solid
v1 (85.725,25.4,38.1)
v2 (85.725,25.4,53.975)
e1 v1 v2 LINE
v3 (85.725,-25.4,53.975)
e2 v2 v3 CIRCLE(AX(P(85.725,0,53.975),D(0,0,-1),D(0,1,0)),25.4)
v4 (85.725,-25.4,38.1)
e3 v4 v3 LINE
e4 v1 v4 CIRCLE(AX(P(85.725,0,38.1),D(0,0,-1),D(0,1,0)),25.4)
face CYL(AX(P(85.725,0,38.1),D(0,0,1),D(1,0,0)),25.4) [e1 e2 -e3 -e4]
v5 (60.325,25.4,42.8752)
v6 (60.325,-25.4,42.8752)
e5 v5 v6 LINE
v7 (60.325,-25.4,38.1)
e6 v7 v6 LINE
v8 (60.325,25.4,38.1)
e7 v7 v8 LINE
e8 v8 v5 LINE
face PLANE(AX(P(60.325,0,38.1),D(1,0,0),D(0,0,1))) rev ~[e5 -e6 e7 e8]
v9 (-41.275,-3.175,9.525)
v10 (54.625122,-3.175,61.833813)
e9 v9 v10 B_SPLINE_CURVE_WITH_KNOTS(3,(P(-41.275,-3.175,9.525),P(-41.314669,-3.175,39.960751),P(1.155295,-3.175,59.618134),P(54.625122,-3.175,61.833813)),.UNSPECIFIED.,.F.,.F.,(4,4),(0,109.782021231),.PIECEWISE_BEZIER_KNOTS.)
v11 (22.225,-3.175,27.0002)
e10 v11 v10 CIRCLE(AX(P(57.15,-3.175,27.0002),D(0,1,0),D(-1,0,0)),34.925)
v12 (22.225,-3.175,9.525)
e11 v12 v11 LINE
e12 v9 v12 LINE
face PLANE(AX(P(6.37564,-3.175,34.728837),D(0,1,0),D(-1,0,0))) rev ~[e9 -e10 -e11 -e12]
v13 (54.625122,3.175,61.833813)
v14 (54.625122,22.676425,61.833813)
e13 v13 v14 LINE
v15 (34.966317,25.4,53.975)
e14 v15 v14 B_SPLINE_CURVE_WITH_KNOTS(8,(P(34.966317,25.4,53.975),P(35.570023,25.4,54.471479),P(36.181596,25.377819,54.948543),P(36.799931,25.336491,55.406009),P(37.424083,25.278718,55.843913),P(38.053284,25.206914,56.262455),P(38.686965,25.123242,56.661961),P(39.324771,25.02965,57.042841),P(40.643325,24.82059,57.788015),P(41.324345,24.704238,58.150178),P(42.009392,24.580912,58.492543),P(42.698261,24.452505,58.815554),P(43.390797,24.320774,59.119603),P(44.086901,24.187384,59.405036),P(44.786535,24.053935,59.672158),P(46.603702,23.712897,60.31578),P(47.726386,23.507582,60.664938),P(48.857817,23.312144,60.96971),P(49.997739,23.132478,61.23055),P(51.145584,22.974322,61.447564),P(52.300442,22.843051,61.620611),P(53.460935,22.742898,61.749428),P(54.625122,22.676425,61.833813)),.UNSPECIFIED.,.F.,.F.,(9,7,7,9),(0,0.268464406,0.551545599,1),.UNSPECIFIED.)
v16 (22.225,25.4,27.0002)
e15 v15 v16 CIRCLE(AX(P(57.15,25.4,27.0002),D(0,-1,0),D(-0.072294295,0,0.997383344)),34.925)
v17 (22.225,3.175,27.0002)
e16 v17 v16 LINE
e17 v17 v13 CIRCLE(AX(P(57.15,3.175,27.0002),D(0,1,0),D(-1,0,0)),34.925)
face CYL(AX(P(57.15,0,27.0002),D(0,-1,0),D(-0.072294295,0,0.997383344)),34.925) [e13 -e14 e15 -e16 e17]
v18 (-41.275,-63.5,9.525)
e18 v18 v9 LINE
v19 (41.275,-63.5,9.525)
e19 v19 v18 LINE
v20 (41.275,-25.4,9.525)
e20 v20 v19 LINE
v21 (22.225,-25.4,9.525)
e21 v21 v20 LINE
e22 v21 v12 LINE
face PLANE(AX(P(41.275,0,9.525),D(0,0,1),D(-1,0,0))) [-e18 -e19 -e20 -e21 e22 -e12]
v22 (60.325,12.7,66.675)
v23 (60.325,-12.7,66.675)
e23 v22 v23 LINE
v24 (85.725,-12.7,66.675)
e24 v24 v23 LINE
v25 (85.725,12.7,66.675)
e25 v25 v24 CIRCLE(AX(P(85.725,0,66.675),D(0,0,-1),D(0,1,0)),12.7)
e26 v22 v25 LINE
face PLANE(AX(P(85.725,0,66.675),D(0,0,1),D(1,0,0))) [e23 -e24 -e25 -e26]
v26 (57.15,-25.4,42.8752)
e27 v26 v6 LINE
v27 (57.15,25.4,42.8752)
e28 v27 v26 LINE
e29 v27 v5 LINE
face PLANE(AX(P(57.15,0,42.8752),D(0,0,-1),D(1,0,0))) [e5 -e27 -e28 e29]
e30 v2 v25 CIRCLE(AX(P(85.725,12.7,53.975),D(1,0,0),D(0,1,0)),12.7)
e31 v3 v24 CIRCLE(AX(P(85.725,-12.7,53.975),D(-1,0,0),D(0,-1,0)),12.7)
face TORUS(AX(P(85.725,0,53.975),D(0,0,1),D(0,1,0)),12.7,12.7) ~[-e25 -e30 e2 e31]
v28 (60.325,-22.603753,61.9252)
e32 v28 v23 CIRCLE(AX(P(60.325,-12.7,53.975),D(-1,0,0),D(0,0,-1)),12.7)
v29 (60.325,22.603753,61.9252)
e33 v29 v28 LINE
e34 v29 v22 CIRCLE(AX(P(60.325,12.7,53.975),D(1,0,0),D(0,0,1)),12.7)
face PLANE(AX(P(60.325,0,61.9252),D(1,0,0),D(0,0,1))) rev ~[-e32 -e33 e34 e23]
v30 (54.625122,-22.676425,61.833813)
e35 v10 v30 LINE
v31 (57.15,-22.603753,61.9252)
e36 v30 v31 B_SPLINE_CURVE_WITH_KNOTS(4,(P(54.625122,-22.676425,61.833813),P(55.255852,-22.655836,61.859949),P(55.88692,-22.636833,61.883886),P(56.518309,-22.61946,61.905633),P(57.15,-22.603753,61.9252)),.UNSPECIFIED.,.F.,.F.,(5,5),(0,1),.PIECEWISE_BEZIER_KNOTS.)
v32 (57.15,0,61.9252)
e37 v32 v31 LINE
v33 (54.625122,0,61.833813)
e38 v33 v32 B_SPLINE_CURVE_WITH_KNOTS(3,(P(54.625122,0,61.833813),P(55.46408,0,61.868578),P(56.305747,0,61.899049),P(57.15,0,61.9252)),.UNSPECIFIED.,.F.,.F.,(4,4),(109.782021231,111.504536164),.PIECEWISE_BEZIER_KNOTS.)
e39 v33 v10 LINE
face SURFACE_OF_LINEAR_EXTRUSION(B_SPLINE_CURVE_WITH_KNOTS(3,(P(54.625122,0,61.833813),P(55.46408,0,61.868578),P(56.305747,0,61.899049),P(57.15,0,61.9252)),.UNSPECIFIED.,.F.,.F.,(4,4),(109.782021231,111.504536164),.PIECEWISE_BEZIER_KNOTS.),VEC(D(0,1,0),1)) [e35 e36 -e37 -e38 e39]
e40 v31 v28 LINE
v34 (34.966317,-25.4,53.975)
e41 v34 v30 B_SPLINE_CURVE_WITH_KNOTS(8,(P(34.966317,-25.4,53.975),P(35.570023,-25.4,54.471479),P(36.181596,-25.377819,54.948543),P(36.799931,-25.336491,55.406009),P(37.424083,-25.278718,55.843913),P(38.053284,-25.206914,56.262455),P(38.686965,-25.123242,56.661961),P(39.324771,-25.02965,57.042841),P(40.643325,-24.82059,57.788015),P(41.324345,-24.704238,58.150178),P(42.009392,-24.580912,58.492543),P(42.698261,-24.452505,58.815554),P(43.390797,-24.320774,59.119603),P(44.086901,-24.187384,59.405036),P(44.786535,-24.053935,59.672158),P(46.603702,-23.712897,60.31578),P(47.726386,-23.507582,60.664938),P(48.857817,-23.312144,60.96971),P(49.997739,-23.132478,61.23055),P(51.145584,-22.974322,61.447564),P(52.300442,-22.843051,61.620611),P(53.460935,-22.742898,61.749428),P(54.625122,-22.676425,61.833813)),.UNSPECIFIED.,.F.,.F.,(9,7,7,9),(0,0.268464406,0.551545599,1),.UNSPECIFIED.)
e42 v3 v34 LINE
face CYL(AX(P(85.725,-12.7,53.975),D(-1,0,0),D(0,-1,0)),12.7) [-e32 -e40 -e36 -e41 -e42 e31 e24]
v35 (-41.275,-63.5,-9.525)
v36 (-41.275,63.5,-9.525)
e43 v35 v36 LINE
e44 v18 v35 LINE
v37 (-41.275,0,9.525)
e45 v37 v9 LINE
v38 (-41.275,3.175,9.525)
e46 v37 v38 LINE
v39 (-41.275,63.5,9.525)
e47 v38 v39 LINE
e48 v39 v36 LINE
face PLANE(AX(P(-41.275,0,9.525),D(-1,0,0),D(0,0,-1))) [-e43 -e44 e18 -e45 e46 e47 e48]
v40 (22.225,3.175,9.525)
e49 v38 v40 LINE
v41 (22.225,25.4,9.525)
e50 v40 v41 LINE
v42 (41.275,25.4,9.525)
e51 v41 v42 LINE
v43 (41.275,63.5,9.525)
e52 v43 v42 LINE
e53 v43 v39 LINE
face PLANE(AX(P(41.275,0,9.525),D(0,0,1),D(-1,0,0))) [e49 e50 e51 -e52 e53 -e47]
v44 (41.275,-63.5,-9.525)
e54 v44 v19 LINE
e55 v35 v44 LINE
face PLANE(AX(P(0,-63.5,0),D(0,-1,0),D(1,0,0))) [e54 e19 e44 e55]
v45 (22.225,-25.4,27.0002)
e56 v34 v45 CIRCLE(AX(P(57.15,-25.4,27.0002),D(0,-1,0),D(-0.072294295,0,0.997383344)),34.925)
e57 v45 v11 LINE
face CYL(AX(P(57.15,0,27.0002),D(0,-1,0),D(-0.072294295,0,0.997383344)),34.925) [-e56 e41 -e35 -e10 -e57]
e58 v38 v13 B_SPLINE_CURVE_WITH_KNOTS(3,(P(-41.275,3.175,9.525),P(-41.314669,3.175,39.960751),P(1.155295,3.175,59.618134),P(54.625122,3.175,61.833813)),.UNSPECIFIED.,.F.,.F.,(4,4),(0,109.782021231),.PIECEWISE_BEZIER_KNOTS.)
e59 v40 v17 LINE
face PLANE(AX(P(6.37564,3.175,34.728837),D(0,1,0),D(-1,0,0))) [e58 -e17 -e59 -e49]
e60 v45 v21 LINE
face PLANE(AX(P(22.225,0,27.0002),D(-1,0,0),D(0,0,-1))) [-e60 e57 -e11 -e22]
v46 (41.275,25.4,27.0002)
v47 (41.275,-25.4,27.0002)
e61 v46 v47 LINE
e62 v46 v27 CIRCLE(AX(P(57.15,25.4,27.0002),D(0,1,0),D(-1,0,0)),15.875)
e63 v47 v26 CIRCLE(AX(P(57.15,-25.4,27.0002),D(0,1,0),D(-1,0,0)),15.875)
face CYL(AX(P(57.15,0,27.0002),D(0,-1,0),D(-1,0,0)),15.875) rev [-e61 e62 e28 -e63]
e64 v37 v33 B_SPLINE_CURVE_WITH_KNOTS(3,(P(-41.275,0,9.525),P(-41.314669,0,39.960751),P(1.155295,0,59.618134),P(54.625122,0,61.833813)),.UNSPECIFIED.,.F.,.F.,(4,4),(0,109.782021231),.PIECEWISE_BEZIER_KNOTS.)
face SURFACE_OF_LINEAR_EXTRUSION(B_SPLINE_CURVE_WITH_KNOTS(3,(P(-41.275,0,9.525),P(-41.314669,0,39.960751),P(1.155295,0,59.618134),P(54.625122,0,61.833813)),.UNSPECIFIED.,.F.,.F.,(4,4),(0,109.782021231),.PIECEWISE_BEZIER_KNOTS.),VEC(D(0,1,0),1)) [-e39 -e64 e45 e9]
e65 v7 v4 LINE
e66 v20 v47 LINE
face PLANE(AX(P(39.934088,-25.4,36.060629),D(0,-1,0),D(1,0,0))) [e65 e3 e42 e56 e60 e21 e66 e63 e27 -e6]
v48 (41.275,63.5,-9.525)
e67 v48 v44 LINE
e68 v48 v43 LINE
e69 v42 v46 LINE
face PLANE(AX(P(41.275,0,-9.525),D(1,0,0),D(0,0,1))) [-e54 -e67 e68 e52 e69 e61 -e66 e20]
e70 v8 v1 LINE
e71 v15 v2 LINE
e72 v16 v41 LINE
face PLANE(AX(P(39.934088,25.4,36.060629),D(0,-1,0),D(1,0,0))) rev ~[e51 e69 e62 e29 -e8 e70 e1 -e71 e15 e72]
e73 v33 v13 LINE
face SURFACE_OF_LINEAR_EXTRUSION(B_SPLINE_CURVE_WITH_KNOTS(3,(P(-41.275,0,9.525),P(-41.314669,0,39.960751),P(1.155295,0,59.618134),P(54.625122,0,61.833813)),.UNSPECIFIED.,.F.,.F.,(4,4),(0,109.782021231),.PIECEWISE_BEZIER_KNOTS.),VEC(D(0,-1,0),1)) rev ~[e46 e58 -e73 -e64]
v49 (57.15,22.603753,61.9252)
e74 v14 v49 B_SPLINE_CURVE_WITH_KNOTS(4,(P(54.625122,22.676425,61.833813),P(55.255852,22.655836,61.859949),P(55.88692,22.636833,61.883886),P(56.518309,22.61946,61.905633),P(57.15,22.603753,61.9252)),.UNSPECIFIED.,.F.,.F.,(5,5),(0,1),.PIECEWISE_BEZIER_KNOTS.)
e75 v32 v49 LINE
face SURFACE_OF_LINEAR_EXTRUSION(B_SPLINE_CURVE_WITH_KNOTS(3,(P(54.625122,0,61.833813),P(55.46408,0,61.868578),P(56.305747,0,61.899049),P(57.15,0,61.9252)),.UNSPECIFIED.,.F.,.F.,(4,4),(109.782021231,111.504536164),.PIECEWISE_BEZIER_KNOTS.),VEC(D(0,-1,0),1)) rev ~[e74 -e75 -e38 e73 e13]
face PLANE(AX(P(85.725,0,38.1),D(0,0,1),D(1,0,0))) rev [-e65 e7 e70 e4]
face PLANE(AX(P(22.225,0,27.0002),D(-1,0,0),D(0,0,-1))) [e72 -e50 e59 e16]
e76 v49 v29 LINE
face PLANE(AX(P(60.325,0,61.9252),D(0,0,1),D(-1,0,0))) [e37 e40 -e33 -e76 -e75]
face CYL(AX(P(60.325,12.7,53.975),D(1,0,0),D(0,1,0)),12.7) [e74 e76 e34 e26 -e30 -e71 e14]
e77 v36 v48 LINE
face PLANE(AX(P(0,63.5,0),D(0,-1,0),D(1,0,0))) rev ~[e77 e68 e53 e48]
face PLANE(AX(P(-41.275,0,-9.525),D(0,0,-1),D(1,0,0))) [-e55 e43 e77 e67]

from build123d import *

# Parameters (mm, degrees)
F1_DEPTH = 63.5
F0_W     = 25.4
F0_H     = 19.05
F0_H_2   = 4.7498
F0_H_3   = 4.7752
F2_DEPTH = 25.4
F4_DEPTH = 3.175
F5_R     = 12.7


with BuildPart() as f1:
    # F0 (on Front) → F1 (new body, symmetric)
    with BuildSketch(Plane.XZ):
        Polygon((-41.275, -9.525), (41.275, -9.525), (41.275, 9.525), (22.225, 9.525), (-41.275, 9.525), align=None)
    extrude(amount=F1_DEPTH, both=True)

    # F0 (on Front) → F2 (join, symmetric)
    with BuildSketch(Plane.XZ):
        with BuildLine():
            Line((22.225, 9.525), (41.275, 9.525))
            Line((41.275, 9.525), (41.275, 27.0002))
            ThreePointArc((41.275, 27.0002), (45.9246798487, 38.2255201513), (57.15, 42.8752))
            Line((57.15, 42.8752), (60.325, 42.8752))
            Line((60.325, 42.8752), (60.325, 61.9252))
            Line((60.325, 61.9252), (57.15, 61.9252))
            add(Edge.make_bspline(
                [(54.6251217416, 61.8338132892), (55.4640803854, 61.8685780106), (56.3057470428, 61.8990488271), (57.15, 61.9252)],
                knots=[109.7820212307, 109.7820212307, 109.7820212307, 109.7820212307, 111.5045361635, 111.5045361635, 111.5045361635, 111.5045361635], degree=3))
            ThreePointArc((54.6251217416, 61.8338132892), (31.5771921939, 50.7864802033), (22.225, 27.0002))
            Line((22.225, 27.0002), (22.225, 9.525))
        make_face()
        with Locations((73.025, 52.4002)):
            Rectangle(F0_W, F0_H)
        with Locations((73.025, 64.3001)):
            Rectangle(F0_W, F0_H_2)
        with Locations((73.025, 40.4876)):
            Rectangle(F0_W, F0_H_3)
    extrude(amount=F2_DEPTH, both=True)

    # F0 (on Front) → F3 (revolve)
    with BuildSketch(Plane.XZ):
        Polygon((85.725, 61.9252), (85.725, 42.8752), (85.725, 38.1), (111.125, 38.1), (111.125, 66.675), (85.725, 66.675), align=None)
    revolve(axis=Axis((85.725, 0, 52.3875), (0, 0, 1)))

    # F0 (on Front) → F4 (join, symmetric)
    with BuildSketch(Plane.XZ):
        with BuildLine():
            add(Edge.make_bspline(
                [(-41.275, 9.525), (-41.3146686629, 39.9607514864), (1.1552946366, 59.618133583), (54.6251217416, 61.8338132892)],
                knots=[0, 0, 0, 0, 109.7820212307, 109.7820212307, 109.7820212307, 109.7820212307], degree=3))
            Line((-41.275, 9.525), (22.225, 9.525))
            Line((22.225, 9.525), (22.225, 27.0002))
            ThreePointArc((22.225, 27.0002), (31.5771921939, 50.7864802033), (54.6251217416, 61.8338132892))
        make_face()
    extrude(amount=F4_DEPTH, both=True)

    # F5
    f5_edges = [f1.edges().sort_by_distance(p)[0] for p in [
        (85.725, 25.4, 52.3875),
        (73.025, 25.4, 66.675),
        (73.025, -25.4, 66.675),
        (111.125, 0, 66.675),
    ]]
    fillet(f5_edges, radius=F5_R)


solid = f1.part
